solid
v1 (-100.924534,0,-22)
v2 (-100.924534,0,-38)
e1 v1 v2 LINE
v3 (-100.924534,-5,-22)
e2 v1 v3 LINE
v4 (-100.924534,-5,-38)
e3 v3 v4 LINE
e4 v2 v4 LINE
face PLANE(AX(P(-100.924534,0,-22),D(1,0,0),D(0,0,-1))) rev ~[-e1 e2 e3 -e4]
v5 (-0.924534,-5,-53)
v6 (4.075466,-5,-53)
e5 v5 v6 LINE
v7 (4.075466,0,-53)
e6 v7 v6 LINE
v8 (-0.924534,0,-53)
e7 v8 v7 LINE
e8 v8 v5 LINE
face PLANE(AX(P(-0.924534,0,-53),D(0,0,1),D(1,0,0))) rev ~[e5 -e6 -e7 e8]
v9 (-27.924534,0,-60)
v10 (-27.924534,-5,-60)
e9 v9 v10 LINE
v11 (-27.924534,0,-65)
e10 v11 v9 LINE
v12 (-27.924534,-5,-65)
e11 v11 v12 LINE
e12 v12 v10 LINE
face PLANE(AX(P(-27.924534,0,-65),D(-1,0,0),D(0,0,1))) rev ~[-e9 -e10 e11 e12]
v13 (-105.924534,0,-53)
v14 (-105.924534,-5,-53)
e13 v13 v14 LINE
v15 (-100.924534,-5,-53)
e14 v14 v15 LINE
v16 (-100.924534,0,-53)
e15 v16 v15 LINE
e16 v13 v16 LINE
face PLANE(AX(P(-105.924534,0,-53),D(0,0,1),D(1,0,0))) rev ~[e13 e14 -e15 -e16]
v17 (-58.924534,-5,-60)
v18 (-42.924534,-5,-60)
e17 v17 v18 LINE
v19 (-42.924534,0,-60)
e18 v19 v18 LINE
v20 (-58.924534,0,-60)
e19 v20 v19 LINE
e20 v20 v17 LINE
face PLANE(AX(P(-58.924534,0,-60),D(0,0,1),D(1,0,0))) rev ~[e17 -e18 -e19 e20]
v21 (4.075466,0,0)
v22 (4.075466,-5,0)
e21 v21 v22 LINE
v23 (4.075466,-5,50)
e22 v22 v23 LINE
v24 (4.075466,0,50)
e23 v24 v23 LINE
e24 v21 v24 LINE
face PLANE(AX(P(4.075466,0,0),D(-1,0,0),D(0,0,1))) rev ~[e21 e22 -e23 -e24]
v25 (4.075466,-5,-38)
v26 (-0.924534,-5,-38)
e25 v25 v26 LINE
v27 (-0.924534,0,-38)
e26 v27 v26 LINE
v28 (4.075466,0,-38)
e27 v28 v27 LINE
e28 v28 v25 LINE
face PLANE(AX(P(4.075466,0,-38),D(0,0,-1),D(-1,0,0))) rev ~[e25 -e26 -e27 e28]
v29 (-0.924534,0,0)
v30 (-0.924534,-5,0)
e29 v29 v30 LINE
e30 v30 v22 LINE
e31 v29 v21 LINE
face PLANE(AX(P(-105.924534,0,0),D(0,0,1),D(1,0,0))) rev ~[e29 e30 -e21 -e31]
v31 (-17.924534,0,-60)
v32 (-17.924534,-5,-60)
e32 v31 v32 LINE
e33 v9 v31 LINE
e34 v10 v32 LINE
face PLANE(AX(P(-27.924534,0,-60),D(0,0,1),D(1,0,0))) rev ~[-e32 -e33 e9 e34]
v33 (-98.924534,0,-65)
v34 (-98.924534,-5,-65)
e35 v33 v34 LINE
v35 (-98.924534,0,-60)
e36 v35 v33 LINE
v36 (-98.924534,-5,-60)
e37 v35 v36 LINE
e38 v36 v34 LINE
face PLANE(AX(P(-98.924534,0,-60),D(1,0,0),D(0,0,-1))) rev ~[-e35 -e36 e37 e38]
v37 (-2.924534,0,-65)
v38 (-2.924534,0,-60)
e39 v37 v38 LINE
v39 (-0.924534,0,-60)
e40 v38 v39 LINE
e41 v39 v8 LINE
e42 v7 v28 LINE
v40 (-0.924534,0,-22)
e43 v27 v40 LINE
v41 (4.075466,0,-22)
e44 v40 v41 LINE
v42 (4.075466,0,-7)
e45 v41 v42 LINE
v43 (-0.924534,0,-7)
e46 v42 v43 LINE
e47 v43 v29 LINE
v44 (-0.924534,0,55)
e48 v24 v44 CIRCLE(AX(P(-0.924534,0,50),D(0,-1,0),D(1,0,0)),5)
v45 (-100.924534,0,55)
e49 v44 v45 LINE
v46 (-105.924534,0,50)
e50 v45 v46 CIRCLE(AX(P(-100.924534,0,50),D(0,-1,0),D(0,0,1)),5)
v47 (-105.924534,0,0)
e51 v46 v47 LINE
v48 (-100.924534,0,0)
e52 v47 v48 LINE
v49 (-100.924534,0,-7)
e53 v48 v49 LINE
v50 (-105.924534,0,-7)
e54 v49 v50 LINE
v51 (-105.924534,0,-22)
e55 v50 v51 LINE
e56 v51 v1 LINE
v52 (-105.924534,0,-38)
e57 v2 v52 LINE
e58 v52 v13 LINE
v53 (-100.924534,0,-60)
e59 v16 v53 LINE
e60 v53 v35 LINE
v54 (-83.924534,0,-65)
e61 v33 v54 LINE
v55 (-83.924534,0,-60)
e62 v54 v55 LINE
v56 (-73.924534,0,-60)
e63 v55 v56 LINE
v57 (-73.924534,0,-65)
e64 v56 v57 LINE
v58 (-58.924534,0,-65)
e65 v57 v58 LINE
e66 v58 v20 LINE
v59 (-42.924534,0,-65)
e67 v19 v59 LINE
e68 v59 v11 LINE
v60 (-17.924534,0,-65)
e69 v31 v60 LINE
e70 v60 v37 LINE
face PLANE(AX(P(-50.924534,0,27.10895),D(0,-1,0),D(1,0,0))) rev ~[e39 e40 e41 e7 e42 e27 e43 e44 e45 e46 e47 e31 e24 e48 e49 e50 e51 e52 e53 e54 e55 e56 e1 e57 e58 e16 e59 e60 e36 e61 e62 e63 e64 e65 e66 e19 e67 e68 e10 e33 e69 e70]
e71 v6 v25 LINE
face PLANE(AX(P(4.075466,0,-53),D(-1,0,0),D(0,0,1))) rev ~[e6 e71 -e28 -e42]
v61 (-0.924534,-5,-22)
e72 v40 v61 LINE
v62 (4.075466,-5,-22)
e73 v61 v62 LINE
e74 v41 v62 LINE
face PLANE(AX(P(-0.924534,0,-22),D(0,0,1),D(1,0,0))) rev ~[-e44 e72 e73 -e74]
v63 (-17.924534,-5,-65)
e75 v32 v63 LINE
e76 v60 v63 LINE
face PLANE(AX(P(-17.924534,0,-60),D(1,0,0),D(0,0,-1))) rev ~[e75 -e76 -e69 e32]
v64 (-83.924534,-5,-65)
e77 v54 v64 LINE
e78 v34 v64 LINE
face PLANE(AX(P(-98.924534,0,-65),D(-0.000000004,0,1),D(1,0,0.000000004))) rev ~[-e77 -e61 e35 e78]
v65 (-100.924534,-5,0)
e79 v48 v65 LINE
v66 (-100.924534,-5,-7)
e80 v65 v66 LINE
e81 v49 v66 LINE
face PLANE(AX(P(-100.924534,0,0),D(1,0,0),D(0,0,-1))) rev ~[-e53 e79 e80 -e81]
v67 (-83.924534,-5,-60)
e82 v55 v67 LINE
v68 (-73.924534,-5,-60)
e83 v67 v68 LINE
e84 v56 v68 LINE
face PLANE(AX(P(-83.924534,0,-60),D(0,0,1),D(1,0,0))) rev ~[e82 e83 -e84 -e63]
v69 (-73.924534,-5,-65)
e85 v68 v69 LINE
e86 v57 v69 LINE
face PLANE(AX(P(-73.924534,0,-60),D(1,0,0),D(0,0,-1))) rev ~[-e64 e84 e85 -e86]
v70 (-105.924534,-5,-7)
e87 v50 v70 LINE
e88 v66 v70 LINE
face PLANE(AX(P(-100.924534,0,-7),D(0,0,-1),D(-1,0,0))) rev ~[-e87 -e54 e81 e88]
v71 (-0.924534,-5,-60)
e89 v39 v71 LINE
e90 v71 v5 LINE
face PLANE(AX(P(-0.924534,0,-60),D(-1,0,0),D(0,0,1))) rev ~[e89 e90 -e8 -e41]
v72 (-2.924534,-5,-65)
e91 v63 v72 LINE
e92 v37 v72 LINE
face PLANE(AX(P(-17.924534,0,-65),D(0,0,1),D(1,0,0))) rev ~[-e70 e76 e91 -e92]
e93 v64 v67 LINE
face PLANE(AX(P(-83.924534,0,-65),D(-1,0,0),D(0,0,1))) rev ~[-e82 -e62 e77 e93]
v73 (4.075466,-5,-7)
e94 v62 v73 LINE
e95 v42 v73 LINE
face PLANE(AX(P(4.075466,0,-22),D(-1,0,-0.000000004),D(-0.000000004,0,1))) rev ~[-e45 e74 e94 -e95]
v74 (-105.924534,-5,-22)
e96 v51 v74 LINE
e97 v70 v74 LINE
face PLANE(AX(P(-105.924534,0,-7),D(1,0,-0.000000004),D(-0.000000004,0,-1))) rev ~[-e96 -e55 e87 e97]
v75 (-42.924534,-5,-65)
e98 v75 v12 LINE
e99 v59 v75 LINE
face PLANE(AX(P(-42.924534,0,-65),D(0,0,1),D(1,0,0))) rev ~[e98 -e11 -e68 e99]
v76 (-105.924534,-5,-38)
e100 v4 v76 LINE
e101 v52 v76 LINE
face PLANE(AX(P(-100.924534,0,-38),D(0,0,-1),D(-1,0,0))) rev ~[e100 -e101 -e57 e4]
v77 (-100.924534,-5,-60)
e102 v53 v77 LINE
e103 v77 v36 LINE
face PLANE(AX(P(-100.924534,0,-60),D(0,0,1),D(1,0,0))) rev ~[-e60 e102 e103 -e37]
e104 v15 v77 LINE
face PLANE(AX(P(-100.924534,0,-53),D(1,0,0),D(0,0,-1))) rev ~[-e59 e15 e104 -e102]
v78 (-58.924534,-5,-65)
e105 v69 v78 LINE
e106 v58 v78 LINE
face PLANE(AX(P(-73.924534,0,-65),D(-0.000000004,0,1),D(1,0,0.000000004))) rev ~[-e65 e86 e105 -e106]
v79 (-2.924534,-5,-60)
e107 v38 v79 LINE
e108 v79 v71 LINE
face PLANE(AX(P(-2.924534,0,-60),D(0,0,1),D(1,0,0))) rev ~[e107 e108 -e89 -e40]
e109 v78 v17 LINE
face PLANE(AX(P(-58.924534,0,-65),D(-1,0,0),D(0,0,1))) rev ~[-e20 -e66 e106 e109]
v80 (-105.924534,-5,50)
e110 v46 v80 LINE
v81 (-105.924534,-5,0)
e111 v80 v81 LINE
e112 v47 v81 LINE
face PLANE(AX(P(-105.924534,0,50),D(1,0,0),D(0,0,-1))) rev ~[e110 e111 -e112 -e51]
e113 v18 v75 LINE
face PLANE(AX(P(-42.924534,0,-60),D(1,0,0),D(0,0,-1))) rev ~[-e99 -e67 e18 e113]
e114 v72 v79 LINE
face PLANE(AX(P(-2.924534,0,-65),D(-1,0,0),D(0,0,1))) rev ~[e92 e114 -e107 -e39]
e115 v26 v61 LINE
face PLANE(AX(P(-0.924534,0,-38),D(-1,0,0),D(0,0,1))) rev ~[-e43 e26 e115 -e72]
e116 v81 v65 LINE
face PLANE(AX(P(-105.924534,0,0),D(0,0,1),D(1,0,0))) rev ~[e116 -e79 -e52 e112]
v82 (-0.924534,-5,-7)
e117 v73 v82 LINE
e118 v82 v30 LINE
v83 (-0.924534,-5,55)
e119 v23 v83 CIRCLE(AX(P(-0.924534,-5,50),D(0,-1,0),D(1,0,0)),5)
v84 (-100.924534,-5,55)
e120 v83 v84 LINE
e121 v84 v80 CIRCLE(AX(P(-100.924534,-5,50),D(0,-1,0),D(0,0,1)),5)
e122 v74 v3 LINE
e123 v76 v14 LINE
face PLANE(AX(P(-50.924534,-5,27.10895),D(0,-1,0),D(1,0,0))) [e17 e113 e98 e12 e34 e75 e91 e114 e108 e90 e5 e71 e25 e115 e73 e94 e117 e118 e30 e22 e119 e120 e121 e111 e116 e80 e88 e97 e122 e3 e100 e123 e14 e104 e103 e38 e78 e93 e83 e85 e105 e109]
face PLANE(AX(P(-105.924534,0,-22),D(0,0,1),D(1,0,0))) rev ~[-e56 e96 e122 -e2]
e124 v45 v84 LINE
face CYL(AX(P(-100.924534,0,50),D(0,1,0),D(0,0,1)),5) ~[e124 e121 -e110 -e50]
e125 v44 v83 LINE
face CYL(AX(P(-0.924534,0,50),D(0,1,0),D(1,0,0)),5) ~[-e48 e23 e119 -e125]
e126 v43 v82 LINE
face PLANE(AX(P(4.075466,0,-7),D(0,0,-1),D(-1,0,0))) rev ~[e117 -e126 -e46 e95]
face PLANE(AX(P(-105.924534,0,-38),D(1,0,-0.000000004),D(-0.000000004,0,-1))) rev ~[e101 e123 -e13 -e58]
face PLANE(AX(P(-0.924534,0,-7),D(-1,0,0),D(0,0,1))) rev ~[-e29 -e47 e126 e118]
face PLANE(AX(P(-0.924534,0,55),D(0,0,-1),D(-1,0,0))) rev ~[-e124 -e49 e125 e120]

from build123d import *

# Parameters (mm, degrees)
F1_DEPTH = 5
F2_DEPTH = 5
F3_DEPTH = 5


# Not quite as in the source:
# - a feature names something its author has since deleted; it is built from what else it names


with BuildPart() as f1:
    # F0 (on Front) → F1 (new body)
    with BuildSketch(Plane.XZ):
        Polygon((-50.9245342757, -5.52e-08), (-100.9245342757, -5.52e-08), (-100.9245342757, -7), (-105.9245342757, -7), (-105.924534339, -22), (-100.9245342757, -22), (-100.9245342757, -38), (-105.9245342757, -38), (-105.924534339, -53), (-100.9245342757, -53), (-100.9245342757, -60.0000000552), (-98.924534339, -60.0000000552), (-98.924534339, -65.0000000552), (-83.924534339, -65), (-83.924534339, -60.0000000552), (-73.924534339, -60.0000000552), (-73.924534339, -65.0000000552), (-58.924534339, -65), (-58.924534339, -60.0000000552), (-42.9245342757, -60.0000000552), (-42.9245342757, -65.0000000552), (-27.9245342757, -65.0000000552), (-27.9245342757, -60.0000000552), (-17.9245342757, -60.0000000552), (-17.9245342757, -65.0000000552), (-2.9245342757, -65.0000000552), (-2.9245342757, -60.0000000552), (-0.9245342757, -60.0000000552), (-0.9245342757, -53.0000000552), (4.0754657243, -53.0000000552), (4.0754657243, -38.0000000552), (-0.9245342757, -38.0000000552), (-0.9245342757, -22), (4.0754657243, -22), (4.075465661, -7), (-0.9245342757, -7), (-0.9245342757, -5.52e-08), align=None)
    extrude(amount=F1_DEPTH)

    # F0 (on Front) → F2 (join)
    with BuildSketch(Plane.XZ):
        with BuildLine():
            Line((-105.9245342757, -5.52e-08), (-100.9245342757, -5.52e-08))
            Line((-100.9245342757, -5.52e-08), (-50.9245342757, -5.52e-08))
            Line((-50.9245342757, -5.52e-08), (-0.9245342757, -5.52e-08))
            Line((-0.9245342757, -5.52e-08), (4.0754657243, -5.52e-08))
            Line((4.0754657243, -5.52e-08), (4.0754657243, 49.9999999448))
            ThreePointArc((4.0754657243, 49.9999999448), (2.6109996302, 53.5355338508), (-0.9245342757, 54.9999999448))
            Line((-0.9245342757, 54.9999999448), (-100.9245342757, 54.9999999448))
            ThreePointArc((-100.9245342757, 54.9999999448), (-104.4600681817, 53.5355338508), (-105.9245342757, 49.9999999448))
            Line((-105.9245342757, 49.9999999448), (-105.9245342757, -5.52e-08))
        make_face()
    extrude(amount=F2_DEPTH)

    # F0 (on Front) → F3 (join)
    with BuildSketch(Plane.XZ):
        with BuildLine():
            Line((-105.9245342757, -5.52e-08), (-100.9245342757, -5.52e-08))
            Line((-100.9245342757, -5.52e-08), (-50.9245342757, -5.52e-08))
            Line((-50.9245342757, -5.52e-08), (-0.9245342757, -5.52e-08))
            Line((-0.9245342757, -5.52e-08), (4.0754657243, -5.52e-08))
            Line((4.0754657243, -5.52e-08), (4.0754657243, 49.9999999448))
            ThreePointArc((4.0754657243, 49.9999999448), (2.6109996302, 53.5355338508), (-0.9245342757, 54.9999999448))
            Line((-0.9245342757, 54.9999999448), (-100.9245342757, 54.9999999448))
            ThreePointArc((-100.9245342757, 54.9999999448), (-104.4600681817, 53.5355338508), (-105.9245342757, 49.9999999448))
            Line((-105.9245342757, 49.9999999448), (-105.9245342757, -5.52e-08))
        make_face()
    extrude(amount=F3_DEPTH)


solid = f1.part
